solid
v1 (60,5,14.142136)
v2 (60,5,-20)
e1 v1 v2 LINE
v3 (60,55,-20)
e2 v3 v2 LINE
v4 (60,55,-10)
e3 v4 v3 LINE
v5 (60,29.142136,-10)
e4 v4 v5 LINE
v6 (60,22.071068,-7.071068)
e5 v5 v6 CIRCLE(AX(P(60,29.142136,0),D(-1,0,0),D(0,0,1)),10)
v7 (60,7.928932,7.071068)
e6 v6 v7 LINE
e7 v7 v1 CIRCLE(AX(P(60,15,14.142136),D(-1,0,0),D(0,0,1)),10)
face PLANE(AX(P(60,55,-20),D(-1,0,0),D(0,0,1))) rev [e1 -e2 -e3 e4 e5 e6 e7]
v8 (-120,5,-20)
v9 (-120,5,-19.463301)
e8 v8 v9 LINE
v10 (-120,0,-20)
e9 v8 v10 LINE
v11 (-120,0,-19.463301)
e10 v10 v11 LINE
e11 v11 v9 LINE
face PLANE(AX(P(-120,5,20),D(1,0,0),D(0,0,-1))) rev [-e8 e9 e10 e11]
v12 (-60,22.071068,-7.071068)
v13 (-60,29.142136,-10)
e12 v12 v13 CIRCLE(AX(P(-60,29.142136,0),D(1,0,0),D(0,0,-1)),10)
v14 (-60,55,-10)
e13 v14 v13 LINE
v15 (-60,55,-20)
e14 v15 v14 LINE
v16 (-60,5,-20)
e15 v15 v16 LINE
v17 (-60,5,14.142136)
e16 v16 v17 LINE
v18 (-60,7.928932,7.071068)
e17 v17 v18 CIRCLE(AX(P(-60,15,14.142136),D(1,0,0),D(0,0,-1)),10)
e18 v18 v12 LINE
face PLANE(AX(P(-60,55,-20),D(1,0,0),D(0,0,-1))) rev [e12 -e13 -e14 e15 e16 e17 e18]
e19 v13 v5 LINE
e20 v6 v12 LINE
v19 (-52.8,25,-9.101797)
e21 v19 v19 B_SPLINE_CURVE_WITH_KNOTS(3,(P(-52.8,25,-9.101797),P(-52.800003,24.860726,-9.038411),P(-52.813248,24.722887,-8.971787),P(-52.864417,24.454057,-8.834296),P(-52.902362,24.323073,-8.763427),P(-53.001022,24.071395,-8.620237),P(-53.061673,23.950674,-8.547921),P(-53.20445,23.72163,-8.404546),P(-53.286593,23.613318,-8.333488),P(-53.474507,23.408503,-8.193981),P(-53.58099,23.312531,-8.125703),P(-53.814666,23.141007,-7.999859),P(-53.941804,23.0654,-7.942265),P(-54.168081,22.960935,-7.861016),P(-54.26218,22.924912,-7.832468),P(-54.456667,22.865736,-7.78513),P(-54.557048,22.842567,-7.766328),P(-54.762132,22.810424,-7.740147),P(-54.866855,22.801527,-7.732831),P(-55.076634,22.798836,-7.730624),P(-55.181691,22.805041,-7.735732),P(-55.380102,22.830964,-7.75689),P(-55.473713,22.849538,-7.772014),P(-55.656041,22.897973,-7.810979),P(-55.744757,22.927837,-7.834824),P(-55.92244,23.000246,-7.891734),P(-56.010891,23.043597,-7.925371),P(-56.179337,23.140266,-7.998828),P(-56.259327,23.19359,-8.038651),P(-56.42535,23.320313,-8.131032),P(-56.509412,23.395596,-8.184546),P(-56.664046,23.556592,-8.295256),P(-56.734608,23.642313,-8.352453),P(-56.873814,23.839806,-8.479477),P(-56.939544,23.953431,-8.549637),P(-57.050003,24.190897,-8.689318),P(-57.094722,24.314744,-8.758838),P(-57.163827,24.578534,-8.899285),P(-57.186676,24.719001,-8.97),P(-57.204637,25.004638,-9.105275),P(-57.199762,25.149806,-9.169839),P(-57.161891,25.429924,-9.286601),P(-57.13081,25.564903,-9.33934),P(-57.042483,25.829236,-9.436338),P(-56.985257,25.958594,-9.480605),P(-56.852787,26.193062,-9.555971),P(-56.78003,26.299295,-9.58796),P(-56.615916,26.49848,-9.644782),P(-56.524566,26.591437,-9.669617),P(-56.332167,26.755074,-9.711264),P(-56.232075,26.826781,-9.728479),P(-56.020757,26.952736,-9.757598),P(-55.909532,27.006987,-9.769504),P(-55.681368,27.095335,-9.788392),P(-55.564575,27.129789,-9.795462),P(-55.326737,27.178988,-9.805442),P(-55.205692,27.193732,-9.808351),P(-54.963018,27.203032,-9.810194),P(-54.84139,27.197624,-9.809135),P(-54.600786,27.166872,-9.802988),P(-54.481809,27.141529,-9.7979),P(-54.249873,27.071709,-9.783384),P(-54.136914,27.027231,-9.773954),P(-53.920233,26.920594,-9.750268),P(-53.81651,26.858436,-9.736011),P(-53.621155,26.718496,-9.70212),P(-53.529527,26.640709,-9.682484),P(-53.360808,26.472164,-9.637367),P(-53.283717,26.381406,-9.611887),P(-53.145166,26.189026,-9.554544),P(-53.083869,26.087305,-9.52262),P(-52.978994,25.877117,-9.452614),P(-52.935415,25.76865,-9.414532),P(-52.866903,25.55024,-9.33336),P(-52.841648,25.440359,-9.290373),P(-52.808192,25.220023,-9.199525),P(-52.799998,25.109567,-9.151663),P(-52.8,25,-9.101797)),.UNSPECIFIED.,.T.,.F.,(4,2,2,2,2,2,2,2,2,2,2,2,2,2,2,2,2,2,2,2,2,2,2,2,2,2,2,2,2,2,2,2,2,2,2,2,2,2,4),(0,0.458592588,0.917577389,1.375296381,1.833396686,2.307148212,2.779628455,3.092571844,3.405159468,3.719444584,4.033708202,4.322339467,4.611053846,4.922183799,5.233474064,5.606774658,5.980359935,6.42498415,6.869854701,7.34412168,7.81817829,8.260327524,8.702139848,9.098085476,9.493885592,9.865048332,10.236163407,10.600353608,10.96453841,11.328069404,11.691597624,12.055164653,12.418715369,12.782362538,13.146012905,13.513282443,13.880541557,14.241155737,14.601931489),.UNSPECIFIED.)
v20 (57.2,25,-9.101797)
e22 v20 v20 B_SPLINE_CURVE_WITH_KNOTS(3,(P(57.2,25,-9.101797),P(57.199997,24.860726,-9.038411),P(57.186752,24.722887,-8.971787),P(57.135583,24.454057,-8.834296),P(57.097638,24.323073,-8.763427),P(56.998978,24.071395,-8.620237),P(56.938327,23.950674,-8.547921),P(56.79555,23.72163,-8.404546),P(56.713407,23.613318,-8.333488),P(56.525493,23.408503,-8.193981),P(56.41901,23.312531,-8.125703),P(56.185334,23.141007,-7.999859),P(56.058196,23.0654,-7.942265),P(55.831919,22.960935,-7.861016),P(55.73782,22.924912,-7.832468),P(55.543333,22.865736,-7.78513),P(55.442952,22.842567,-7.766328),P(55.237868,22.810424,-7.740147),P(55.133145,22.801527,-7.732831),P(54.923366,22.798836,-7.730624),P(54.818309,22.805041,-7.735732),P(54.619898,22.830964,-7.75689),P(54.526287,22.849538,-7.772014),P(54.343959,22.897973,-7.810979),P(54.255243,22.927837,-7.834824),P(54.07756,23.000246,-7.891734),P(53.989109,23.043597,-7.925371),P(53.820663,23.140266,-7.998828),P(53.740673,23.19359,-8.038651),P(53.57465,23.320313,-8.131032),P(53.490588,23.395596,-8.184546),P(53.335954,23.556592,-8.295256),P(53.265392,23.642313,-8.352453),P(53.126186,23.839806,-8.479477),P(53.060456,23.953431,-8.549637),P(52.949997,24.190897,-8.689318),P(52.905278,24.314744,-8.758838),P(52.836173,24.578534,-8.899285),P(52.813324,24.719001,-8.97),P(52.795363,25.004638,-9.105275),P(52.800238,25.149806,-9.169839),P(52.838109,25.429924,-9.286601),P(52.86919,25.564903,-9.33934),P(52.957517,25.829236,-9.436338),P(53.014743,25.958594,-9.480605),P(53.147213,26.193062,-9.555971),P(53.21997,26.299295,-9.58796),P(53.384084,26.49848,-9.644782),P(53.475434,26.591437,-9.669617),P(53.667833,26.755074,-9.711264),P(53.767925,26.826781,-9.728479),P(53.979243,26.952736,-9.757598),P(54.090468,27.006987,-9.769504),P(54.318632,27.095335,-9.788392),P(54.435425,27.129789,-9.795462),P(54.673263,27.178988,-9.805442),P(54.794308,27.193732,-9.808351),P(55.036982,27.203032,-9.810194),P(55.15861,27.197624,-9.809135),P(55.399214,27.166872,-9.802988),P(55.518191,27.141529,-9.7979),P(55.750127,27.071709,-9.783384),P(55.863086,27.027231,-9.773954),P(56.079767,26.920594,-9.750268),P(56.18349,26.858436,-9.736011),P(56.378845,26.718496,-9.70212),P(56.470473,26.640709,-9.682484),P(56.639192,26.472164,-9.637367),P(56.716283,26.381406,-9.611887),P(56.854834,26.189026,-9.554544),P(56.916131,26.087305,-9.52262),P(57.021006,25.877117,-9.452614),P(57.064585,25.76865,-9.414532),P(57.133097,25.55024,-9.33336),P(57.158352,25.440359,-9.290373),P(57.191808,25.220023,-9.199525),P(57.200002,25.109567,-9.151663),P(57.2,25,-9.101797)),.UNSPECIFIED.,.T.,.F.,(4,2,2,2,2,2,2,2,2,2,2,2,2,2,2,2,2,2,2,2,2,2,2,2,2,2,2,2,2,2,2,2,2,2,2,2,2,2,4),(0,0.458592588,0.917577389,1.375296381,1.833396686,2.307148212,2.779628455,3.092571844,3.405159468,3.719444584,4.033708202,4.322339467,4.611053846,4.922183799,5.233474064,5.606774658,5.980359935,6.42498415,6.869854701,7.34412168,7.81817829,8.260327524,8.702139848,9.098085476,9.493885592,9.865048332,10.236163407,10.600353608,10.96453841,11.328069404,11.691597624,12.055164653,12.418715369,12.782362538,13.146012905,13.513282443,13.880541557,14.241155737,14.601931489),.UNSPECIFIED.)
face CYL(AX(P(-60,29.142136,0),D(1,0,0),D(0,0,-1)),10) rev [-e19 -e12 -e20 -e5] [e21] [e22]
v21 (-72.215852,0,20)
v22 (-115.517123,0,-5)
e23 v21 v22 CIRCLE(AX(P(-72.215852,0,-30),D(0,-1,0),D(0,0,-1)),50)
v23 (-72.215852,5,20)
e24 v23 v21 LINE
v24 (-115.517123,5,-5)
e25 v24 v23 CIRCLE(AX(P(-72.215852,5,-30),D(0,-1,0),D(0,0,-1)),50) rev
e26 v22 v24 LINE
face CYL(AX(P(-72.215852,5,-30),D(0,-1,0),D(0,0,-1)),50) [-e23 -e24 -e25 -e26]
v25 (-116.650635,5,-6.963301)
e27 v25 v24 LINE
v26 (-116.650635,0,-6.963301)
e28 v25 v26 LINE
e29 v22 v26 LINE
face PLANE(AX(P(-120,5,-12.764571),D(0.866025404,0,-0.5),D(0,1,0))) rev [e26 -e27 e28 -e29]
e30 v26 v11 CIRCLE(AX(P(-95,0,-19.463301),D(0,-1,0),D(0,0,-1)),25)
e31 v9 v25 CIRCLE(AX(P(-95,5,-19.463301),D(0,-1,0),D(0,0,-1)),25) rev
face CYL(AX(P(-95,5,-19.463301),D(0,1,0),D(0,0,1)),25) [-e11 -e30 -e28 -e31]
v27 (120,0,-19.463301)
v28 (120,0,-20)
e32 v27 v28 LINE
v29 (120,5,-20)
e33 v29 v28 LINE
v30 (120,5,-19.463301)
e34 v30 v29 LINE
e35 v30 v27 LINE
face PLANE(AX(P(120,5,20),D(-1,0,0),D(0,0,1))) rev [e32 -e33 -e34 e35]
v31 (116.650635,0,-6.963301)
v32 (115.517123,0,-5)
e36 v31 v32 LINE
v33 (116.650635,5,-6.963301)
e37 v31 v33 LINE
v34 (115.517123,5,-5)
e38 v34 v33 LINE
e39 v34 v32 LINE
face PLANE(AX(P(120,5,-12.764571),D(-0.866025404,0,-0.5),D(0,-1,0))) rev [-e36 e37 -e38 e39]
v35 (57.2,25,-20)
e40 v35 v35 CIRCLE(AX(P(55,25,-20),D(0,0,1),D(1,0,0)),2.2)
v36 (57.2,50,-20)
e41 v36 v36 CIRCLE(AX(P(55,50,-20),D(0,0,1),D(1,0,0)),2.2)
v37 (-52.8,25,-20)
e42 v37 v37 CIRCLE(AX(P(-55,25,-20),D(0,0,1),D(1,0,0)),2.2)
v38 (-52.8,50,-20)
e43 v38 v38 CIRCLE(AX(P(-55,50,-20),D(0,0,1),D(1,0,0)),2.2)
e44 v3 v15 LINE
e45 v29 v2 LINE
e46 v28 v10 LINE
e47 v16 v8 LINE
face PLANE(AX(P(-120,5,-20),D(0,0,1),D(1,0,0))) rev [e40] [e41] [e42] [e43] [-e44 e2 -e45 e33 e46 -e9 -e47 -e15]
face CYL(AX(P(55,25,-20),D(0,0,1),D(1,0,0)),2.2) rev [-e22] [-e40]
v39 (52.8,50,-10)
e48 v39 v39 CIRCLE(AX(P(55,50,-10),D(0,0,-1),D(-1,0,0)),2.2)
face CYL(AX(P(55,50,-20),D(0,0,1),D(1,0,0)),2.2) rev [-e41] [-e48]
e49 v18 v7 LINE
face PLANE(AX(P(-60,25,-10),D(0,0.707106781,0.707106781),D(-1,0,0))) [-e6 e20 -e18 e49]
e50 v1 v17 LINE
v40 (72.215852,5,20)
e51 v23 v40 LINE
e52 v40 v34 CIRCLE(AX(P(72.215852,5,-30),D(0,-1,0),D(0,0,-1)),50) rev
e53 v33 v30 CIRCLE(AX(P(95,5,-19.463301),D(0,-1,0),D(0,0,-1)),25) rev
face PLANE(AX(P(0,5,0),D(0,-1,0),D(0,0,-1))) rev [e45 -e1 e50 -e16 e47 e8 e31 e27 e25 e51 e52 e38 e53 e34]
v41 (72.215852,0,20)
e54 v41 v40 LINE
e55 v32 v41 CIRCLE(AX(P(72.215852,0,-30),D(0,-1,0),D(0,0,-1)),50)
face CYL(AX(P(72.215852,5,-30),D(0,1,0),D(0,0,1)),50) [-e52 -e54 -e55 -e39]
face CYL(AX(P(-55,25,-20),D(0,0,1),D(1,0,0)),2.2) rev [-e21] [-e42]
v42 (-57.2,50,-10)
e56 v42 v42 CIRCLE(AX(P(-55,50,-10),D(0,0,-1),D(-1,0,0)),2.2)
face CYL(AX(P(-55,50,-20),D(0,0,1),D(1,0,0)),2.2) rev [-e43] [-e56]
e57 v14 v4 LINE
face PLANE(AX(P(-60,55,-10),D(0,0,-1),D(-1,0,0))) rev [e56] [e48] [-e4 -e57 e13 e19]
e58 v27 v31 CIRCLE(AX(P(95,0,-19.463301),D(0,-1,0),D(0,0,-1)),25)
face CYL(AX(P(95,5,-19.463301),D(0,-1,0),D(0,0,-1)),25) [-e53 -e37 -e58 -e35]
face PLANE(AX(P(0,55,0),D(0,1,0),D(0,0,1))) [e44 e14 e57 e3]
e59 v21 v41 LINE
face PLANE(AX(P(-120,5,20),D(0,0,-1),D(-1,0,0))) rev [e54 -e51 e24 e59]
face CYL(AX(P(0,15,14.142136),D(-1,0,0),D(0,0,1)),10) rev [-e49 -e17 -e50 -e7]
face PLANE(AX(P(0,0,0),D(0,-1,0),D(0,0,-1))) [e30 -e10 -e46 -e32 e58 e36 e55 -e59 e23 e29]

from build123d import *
from OCP.BRepFilletAPI import BRepFilletAPI_MakeChamfer

# Parameters (mm, degrees)
SKETCH_1_W               = 240
SKETCH_1_H               = 40
EXTRUDE_1_DEPTH          = 5
SKETCH_2_W               = 120
SKETCH_2_H               = 10
EXTRUDE_2_DEPTH          = 50
CHAMFER_1_SIZE           = 20
FILLET_4_R               = 10
CUT_EXTRUDE_1_DEPTH      = 136.369863707
CUT_EXTRUDE_1_DEPTH_BACK = 136.369863707
SKETCH_4_R               = 2.2
CHAMFER_2_SIZE           = 25
CHAMFER_3_SIZE           = 15
CHAMFER_3_SIZE2          = 7.764571353
FILLET_6_R               = 25
FILLET_7_R               = 50
FILLET_8_R               = 50


with BuildPart() as part:
    # 草图1 → 凸台-拉伸1 (new body)
    with BuildSketch(Plane(origin=(0, 0, 0), x_dir=(1, 0, 0), z_dir=(0, 1, 0))):
        Rectangle(SKETCH_1_W, SKETCH_1_H)
    extrude(amount=EXTRUDE_1_DEPTH)

    # 草图2 → 凸台-拉伸2 (add)
    with BuildSketch(Plane(origin=(0, 5, 0), x_dir=(1, 0, 0), z_dir=(0, 1, 0))):
        with Locations((0, 15)):
            Rectangle(SKETCH_2_W, SKETCH_2_H)
    extrude(amount=EXTRUDE_2_DEPTH)

    # 倒角1
    chamfer_1_edges = [part.edges().sort_by_distance(p)[0] for p in [
        (0, 5, -10),
    ]]
    chamfer(chamfer_1_edges, length=CHAMFER_1_SIZE)

    # 圆角4
    fillet_4_edges = [part.edges().sort_by_distance(p)[0] for p in [
        (0, 25, -10),
        (0, 5, 10),
    ]]
    fillet(fillet_4_edges, radius=FILLET_4_R)

    # 草图4 → 切除-拉伸1 (cut, two sides: drawn at the far end of the back side and taken through both)
    with BuildSketch(Plane.XY.offset(-10).offset(-CUT_EXTRUDE_1_DEPTH_BACK)):
        with Locations((-55, 50)):
            Circle(SKETCH_4_R)
        with Locations((55, 50)):
            Circle(SKETCH_4_R)
        with Locations((-55, 25)):
            Circle(SKETCH_4_R)
        with Locations((55, 25)):
            Circle(SKETCH_4_R)
    extrude(amount=CUT_EXTRUDE_1_DEPTH + CUT_EXTRUDE_1_DEPTH_BACK, mode=Mode.SUBTRACT)

    # 倒角2
    chamfer_2_edges = [part.edges().sort_by_distance(p)[0] for p in [
        (120, 2.5, 20),
        (-120, 2.5, 20),
    ]]
    chamfer(chamfer_2_edges, length=CHAMFER_2_SIZE)

    # 倒角3: one chamfer whose edges measure the first distance from different faces: ONE call of the kernel's chamfer builder (chamfer() names one face for all edges)
    chamfer_3_edges_1 = [part.edges().sort_by_distance(p)[0] for p in [
        (120, 2.5, -5),
    ]]
    chamfer_3_side_1 = [part.faces().sort_by_distance(p)[0] for p in [
        (107.5, 2.5, 7.5),
    ]]
    chamfer_3_edges_2 = [part.edges().sort_by_distance(p)[0] for p in [
        (-120, 2.5, -5),
    ]]
    chamfer_3_side_2 = [part.faces().sort_by_distance(p)[0] for p in [
        (-107.5, 2.5, 7.5),
    ]]
    chamfer_3 = BRepFilletAPI_MakeChamfer(part.part.solid().wrapped)
    for e in chamfer_3_edges_1:
        chamfer_3.Add(CHAMFER_3_SIZE, CHAMFER_3_SIZE2, e.wrapped, chamfer_3_side_1[0].wrapped)  # the first distance lies on this face
    for e in chamfer_3_edges_2:
        chamfer_3.Add(CHAMFER_3_SIZE, CHAMFER_3_SIZE2, e.wrapped, chamfer_3_side_2[0].wrapped)  # the first distance lies on this face
    add(Compound.cast(chamfer_3.Shape()), mode=Mode.REPLACE)

    # 圆角6
    fillet_6_edges = [part.edges().sort_by_distance(p)[0] for p in [
        (-120, 2.5, -12.764571353),
        (120, 2.5, -12.764571353),
    ]]
    fillet(fillet_6_edges, radius=FILLET_6_R)

    # 圆角7
    # the kernel refuses this fillet: 50 mm, written as the material it takes off along each edge
    with BuildSketch(Plane(origin=(95, -51.772199057, 20), x_dir=(-1, 0, 0), z_dir=(0, 1, 0))) as fillet_7_piece_1:
        with BuildLine():
            CenterArc((20.708879623, -50), FILLET_7_R, 90, 44.591350674)
            Line((-14.393398282, -14.393398282), (-15.09544384, -13.681266248))
            Line((-15.09544384, -13.681266248), (-0.707106781, 0.707106781))
            Line((-0.707106781, 0.707106781), (0, 1))
            Line((0, 1), (20.708879623, 1))
            Line((20.708879623, 1), (20.708879623, 0))
        make_face()
    extrude(amount=108.544398113, mode=Mode.SUBTRACT)
    with BuildSketch(Plane(origin=(-95, -51.772199057, 20), x_dir=(-0.7071067811865476, 0, -0.7071067811865476), z_dir=(0, 1, 0))) as fillet_7_piece_2:
        with BuildLine():
            CenterArc((20.711949847, -49.998728271), FILLET_7_R, 90.408649326, 44.591350674)
            Line((-14.643389212, -14.643389212), (-15.350495993, -13.936282431))
            Line((-15.350495993, -13.936282431), (-0.707106781, 0.707106781))
            Line((-0.707106781, 0.707106781), (0, 1))
            Line((0, 1), (20.348206844, 0.999974565))
            Line((20.348206844, 0.999974565), (20.355339059, 0))
        make_face()
    extrude(amount=108.544398113, mode=Mode.SUBTRACT)

    # 圆角8
    # the kernel refuses this fillet: 50 mm, written as the material it takes off along each edge
    with BuildSketch(Plane(origin=(109.393398282, -99.666312896, 5.606601718), x_dir=(0.49999999999999956, 0, -0.8660254037844389), z_dir=(0, 1, 0))) as fillet_8_piece_1:
        with BuildLine():
            CenterArc((12.247448714, 50), FILLET_8_R, 210, 60)
            Line((-31.053821475, 25), (-35.383948494, 22.5))
            ThreePointArc((-35.383948494, 22.5), (-34.346314531, 20.702765255), (-1.328508268, -4.820276526))
            Line((-1.328508268, -4.820276526), (0, -5))
            Line((0, -5), (12.247448714, -5))
            Line((12.247448714, -5), (12.247448714, 0))
        make_face()
    extrude(amount=204.332625793, mode=Mode.SUBTRACT)
    with BuildSketch(Plane(origin=(-109.393398282, -99.666312896, 5.606601718), x_dir=(0.9325504463801257, 0, 0.3610396999724933), z_dir=(0, 1, 0))) as fillet_8_piece_2:
        with BuildLine():
            CenterArc((21.81454016, 46.627522319), FILLET_8_R, 231.16406129, 60)
            Line((-9.540086185, 7.680283562), (-12.675548819, 3.785559686))
            Line((-12.675548819, 3.785559686), (-3.135462634, -3.894723876))
            Line((-3.135462634, -3.894723876), (-1.987924813, -4.587826821))
            ThreePointArc((-1.987924813, -4.587826821), (39.736431626, -5.412006342), (41.671723658, -4.662752232))
            Line((41.671723658, -4.662752232), (39.866525159, 0))
        make_face()
    extrude(amount=204.332625793, mode=Mode.SUBTRACT)


solid = part.part
